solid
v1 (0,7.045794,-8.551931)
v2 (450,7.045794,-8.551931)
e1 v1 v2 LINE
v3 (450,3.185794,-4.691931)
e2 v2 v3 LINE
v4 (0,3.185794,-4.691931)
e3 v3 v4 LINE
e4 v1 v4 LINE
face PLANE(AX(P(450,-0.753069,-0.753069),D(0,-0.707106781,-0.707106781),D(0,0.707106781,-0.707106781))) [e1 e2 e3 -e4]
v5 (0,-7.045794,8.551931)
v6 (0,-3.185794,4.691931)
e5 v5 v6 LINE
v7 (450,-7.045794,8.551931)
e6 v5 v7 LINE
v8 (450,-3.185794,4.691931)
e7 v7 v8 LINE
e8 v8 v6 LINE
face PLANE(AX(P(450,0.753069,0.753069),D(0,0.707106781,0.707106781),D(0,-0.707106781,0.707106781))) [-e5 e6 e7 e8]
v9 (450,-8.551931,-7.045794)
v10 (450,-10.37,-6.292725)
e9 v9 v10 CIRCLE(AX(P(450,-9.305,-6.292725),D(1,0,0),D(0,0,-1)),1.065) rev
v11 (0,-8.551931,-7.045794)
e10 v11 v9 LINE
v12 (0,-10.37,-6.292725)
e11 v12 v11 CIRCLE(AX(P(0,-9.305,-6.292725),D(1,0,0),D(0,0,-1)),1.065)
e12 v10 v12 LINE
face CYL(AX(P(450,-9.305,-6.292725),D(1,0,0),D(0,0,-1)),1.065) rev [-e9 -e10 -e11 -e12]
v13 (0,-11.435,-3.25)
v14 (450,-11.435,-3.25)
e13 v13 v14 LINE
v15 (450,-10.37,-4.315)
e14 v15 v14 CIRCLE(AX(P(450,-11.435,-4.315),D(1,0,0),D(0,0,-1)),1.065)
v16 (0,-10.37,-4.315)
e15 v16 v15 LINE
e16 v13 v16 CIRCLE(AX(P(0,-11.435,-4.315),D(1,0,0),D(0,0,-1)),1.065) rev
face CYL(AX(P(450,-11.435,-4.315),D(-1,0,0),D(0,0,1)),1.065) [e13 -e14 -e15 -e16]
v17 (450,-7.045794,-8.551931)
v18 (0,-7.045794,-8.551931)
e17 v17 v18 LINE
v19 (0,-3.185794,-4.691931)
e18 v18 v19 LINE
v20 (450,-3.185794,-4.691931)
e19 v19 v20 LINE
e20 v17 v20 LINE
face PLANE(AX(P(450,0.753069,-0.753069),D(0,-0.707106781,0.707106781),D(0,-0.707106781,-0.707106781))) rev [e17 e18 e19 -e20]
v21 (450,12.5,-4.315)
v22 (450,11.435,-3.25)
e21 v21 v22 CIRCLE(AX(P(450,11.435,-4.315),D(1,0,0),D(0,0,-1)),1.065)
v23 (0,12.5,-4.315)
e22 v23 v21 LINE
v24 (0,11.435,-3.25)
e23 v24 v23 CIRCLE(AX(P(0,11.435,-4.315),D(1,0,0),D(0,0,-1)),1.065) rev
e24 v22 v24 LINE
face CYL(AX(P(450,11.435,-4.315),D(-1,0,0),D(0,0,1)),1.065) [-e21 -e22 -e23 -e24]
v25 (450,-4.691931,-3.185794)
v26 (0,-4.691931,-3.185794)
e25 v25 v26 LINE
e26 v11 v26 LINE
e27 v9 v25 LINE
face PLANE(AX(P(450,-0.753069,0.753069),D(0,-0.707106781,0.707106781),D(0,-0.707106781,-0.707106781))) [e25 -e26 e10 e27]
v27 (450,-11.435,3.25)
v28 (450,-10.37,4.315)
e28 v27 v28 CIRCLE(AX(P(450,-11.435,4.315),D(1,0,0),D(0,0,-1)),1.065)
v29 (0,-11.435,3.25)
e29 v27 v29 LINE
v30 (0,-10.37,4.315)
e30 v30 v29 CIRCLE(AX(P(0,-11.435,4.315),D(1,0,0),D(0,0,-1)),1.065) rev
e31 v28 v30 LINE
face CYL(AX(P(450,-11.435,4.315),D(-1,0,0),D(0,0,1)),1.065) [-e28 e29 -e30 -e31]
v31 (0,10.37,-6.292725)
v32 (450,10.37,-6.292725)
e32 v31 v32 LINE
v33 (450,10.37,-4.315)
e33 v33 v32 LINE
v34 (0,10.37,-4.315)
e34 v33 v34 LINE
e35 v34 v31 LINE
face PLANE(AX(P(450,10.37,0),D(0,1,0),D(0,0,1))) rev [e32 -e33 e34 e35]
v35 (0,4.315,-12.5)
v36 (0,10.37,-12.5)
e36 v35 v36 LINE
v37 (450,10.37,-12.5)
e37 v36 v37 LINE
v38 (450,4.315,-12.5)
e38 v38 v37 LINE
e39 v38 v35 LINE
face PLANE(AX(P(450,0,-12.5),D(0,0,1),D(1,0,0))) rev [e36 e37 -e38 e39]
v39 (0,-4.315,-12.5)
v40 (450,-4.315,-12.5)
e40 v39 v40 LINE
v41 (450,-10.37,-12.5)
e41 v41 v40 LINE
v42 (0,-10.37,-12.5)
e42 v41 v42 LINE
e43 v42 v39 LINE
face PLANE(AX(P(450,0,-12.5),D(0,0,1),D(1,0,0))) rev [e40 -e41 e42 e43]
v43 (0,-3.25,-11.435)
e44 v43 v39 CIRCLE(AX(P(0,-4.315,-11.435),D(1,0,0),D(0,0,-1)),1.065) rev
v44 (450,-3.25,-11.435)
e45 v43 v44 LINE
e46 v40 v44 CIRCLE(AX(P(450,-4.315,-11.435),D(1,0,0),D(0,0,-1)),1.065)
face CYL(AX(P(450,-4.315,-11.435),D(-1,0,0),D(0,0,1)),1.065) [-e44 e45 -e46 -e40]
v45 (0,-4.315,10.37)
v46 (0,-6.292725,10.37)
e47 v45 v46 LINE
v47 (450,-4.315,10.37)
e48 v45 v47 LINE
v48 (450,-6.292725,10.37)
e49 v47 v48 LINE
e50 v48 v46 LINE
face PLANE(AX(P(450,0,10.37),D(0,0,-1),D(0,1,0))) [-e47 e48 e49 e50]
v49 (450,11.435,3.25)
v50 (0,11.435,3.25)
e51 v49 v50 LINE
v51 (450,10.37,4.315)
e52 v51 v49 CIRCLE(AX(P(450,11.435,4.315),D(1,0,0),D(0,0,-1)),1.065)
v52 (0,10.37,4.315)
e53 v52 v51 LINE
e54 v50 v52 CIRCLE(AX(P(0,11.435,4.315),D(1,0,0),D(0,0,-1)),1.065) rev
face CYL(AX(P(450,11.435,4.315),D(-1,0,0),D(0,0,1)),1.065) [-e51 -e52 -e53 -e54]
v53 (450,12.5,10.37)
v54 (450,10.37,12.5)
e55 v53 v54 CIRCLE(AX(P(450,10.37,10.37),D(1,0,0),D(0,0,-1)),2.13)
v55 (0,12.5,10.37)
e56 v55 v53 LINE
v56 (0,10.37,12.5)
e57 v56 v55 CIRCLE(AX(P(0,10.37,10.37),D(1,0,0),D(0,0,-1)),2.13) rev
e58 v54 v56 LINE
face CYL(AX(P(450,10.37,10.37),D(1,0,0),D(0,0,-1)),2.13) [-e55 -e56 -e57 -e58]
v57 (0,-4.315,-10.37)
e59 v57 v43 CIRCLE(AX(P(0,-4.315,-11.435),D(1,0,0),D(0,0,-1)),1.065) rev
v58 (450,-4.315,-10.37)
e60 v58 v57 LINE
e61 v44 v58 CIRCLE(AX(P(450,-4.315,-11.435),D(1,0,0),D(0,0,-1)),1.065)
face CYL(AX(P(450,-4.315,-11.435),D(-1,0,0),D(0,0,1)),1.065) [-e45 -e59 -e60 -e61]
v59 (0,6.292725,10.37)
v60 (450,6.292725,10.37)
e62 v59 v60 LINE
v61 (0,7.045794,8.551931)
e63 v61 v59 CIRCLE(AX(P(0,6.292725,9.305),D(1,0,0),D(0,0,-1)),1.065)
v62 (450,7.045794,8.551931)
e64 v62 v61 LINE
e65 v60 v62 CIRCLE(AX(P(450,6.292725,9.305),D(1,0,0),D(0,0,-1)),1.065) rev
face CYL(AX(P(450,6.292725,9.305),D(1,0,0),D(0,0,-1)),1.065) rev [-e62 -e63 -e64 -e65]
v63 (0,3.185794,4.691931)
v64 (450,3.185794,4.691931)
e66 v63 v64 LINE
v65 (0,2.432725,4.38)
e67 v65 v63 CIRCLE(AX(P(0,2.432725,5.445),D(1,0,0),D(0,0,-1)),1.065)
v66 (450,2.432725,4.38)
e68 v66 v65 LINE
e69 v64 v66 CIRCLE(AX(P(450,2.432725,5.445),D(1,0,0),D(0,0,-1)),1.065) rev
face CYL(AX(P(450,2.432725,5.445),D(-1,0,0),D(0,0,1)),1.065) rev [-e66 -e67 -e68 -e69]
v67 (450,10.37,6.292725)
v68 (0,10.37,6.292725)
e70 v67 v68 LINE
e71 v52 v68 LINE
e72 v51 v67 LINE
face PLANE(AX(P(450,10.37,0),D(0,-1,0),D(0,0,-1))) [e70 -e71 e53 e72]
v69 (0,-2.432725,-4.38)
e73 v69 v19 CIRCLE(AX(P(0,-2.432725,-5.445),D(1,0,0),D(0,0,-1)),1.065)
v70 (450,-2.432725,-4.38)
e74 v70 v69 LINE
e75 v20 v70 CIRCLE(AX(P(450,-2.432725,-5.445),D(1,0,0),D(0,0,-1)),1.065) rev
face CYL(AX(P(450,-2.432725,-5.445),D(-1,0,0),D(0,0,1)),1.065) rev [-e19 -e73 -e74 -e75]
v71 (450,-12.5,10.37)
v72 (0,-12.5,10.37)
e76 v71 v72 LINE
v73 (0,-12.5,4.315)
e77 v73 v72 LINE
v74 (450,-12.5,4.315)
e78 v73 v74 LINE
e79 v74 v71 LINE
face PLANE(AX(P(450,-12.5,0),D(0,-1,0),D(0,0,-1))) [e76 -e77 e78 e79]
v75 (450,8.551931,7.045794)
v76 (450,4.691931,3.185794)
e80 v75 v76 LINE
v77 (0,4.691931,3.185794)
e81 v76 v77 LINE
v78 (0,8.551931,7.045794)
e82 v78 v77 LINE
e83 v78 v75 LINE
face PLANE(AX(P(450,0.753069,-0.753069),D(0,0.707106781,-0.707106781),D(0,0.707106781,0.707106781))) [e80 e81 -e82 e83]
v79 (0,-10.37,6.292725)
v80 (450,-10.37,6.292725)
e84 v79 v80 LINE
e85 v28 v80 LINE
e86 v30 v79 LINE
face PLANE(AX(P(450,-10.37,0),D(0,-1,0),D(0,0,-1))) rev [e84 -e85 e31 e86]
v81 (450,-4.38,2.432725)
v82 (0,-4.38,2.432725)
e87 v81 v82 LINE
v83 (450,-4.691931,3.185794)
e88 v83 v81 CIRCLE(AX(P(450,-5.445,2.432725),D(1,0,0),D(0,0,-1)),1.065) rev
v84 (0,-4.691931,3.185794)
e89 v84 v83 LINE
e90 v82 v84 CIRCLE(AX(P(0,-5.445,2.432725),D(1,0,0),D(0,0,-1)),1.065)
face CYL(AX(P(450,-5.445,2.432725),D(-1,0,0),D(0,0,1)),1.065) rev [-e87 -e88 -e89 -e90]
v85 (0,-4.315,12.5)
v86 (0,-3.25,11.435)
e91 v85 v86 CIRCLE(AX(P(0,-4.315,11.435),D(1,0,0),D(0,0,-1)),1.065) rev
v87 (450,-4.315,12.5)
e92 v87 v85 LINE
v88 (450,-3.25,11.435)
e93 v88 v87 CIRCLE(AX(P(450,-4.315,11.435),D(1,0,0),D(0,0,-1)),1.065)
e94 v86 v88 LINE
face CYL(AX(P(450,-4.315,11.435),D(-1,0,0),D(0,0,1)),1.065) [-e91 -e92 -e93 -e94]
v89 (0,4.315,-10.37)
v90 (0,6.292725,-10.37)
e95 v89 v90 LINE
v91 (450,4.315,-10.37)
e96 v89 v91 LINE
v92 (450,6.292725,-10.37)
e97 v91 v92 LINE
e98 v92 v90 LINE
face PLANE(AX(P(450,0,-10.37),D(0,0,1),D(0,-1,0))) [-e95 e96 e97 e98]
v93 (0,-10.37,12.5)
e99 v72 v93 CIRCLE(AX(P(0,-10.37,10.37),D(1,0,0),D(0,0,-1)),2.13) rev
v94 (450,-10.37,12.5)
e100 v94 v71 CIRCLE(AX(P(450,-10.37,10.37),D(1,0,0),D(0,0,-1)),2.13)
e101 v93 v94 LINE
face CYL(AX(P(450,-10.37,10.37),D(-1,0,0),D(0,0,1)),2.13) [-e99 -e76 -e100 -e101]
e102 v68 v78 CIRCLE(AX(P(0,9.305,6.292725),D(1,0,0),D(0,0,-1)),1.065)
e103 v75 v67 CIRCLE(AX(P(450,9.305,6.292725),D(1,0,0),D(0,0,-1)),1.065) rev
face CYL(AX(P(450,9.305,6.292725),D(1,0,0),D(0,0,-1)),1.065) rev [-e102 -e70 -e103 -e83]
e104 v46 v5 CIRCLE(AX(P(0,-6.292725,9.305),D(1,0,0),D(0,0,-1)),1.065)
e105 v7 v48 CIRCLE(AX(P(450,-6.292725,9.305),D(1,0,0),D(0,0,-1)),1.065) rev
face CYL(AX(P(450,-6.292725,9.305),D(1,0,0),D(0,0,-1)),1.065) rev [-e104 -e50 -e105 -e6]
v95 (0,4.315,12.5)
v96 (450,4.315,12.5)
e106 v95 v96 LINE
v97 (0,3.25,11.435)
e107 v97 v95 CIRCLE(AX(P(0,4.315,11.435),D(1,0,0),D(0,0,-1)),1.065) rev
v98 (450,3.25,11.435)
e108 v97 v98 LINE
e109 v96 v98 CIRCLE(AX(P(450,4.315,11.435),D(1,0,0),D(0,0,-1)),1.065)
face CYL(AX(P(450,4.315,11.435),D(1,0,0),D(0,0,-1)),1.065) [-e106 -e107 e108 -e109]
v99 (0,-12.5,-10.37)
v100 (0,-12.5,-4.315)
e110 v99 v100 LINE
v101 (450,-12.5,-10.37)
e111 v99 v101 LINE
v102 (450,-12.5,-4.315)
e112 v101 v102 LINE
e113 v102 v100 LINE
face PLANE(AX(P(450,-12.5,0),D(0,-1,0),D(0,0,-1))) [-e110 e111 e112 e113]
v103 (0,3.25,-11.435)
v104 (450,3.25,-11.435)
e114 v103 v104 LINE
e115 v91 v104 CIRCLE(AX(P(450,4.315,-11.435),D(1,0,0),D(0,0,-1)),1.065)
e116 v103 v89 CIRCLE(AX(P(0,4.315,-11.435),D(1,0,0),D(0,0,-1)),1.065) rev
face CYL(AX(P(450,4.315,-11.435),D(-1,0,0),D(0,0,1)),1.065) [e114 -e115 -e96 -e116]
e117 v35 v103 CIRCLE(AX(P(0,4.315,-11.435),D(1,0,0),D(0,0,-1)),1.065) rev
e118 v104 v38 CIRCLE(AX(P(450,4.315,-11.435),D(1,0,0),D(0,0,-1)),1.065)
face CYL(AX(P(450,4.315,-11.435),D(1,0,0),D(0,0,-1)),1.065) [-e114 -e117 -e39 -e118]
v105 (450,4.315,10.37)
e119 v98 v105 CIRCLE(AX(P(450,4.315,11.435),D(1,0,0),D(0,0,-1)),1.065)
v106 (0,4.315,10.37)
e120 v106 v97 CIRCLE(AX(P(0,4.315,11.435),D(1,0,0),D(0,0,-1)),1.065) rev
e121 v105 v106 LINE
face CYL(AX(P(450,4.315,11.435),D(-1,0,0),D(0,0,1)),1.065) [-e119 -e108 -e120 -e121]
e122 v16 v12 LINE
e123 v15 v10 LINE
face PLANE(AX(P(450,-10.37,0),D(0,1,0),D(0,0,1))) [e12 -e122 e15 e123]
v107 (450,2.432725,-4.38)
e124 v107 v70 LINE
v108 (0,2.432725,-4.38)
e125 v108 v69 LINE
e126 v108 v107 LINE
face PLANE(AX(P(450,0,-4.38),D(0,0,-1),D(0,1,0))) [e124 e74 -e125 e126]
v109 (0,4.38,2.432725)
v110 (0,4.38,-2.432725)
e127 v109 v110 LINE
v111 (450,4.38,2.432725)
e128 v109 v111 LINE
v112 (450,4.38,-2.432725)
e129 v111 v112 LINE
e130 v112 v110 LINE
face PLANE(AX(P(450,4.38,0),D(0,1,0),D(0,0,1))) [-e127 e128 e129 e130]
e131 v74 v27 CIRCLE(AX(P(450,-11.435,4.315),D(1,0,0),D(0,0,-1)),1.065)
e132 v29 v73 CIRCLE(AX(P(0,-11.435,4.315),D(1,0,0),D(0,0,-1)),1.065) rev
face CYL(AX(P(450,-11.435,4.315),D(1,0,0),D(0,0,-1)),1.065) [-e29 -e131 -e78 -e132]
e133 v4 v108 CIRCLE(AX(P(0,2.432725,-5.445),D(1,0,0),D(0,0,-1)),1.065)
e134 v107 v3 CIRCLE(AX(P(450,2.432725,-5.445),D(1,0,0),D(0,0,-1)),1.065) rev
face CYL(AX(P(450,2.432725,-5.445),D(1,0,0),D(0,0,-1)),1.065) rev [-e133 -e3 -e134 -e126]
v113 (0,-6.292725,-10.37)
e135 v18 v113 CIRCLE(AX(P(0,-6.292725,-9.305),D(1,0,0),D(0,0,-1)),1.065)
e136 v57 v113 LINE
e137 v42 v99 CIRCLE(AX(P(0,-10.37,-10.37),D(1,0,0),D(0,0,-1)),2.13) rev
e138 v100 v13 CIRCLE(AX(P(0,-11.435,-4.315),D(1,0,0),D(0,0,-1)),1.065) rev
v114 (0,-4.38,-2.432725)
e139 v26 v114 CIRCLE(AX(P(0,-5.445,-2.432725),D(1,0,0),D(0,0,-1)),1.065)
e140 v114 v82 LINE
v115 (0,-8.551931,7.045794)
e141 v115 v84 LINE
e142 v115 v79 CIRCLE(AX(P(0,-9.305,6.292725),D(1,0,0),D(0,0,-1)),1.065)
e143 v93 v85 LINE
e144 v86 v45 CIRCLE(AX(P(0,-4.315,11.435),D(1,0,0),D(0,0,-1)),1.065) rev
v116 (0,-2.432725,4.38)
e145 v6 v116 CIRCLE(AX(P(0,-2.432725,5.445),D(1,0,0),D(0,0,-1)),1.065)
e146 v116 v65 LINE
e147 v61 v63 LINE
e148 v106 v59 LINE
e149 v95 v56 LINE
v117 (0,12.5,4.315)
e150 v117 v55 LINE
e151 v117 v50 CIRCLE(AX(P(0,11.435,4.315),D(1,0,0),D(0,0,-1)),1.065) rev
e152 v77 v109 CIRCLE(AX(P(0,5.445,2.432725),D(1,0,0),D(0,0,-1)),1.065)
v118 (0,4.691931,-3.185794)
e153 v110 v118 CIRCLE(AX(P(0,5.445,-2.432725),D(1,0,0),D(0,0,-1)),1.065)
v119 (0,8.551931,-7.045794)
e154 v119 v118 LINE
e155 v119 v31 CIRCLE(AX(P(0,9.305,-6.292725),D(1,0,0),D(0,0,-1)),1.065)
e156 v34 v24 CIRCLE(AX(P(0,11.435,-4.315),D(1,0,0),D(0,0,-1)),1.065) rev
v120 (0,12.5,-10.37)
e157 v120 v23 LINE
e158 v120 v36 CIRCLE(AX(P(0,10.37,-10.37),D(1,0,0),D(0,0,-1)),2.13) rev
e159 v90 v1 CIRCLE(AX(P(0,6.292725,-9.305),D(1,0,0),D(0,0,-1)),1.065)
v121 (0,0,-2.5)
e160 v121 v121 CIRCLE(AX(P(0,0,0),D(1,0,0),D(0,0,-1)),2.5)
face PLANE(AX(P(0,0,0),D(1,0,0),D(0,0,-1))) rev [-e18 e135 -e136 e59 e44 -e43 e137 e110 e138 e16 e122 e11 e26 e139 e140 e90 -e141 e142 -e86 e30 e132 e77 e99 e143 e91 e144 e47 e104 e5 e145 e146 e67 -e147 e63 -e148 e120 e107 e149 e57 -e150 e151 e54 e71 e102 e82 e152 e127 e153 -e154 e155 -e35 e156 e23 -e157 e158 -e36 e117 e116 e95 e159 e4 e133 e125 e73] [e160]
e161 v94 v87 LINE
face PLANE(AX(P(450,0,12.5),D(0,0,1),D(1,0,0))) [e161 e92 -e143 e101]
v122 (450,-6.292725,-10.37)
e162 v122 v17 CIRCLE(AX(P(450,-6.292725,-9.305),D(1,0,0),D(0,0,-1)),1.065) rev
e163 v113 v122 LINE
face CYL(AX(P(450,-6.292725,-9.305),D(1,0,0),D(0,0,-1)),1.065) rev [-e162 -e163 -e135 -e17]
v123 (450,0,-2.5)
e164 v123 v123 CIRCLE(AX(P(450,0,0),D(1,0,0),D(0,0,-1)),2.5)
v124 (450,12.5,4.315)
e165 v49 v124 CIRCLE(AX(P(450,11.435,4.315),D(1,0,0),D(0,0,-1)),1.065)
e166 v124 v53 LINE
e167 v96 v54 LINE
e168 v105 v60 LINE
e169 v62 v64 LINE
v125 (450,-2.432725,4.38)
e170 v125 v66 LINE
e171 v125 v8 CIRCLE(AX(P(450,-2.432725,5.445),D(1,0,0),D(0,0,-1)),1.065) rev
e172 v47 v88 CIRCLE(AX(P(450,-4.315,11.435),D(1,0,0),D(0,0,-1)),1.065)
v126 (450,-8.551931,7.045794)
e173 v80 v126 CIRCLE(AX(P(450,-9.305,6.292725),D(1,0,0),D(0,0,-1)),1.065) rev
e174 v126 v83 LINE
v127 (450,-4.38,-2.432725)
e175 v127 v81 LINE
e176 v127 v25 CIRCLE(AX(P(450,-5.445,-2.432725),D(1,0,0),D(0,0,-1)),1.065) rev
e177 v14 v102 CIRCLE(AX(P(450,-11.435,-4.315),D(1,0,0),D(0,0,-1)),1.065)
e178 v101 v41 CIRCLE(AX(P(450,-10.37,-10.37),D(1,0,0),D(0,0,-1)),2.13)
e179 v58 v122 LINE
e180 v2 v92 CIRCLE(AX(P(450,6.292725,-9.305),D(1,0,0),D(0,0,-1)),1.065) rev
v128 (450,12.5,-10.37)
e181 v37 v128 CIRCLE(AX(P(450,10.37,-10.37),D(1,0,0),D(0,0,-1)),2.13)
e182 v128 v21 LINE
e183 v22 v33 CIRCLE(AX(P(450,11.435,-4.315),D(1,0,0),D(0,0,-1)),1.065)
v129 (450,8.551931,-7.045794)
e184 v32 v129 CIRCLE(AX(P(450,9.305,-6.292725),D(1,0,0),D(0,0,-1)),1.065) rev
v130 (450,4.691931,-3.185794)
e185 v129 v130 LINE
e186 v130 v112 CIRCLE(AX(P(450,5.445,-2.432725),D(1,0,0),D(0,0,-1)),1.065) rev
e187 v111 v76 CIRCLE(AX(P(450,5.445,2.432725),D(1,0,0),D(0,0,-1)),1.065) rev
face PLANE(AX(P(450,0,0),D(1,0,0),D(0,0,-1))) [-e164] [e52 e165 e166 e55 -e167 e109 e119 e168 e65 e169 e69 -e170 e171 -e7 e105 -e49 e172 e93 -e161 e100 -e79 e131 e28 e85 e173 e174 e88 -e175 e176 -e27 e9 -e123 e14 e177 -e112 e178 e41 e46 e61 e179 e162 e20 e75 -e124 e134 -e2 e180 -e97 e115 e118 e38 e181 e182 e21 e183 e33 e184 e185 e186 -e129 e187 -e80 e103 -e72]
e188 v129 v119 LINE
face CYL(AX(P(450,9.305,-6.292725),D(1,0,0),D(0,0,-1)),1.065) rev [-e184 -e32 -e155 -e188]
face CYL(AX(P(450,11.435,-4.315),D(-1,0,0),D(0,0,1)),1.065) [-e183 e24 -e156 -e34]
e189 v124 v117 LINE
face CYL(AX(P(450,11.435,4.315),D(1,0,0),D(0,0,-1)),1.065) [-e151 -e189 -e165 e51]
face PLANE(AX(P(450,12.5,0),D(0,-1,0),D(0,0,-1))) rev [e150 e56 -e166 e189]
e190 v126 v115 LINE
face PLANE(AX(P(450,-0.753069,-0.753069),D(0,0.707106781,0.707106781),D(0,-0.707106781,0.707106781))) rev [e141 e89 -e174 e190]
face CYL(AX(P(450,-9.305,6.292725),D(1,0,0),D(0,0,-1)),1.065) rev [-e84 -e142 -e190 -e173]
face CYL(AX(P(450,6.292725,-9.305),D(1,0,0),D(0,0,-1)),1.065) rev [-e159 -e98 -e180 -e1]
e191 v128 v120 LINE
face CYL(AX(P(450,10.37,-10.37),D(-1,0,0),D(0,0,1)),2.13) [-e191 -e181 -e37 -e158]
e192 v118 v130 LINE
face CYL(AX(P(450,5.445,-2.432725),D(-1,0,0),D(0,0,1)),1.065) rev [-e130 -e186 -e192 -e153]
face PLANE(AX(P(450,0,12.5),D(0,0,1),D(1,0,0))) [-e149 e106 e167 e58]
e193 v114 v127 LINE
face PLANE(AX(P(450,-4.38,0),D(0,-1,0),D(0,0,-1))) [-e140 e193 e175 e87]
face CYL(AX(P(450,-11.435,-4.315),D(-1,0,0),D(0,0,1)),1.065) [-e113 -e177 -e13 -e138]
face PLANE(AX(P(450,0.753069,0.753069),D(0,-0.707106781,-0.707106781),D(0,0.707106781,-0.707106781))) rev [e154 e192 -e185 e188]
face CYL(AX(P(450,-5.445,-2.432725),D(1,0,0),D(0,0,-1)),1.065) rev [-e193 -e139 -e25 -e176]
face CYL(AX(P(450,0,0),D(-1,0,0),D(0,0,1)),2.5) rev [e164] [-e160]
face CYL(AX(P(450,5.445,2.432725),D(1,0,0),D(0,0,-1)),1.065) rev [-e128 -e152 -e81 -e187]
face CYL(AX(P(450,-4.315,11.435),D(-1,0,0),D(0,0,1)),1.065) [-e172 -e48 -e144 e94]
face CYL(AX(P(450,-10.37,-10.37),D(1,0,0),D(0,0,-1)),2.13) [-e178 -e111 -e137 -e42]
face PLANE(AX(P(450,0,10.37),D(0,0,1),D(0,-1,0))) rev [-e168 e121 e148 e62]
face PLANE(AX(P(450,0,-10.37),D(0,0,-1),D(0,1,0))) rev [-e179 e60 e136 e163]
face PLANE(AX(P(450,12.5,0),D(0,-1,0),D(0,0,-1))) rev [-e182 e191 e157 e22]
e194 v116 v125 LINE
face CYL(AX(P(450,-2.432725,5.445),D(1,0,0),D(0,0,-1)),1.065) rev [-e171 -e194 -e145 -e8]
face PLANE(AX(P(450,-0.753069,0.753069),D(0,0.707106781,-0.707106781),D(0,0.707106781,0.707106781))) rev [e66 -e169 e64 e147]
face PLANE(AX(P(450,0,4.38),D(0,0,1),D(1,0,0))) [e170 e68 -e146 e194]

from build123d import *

# Parameters (mm, degrees)
SKETCH1_R           = 2.5
BOSS_EXTRUDE1_DEPTH = 450
FILLET1_R           = 1.065
FILLET2_R           = 2.13


with BuildPart() as part:
    # Sketch1 → Boss-Extrude1 (new body)
    with BuildSketch(Plane.YZ):
        Polygon((-12.5, -3.25), (-12.5, -12.5), (-3.25, -12.5), (-3.25, -10.37), (-8.863862556, -10.37), (-2.873862556, -4.38), (2.873862556, -4.38), (8.863862556, -10.37), (3.25, -10.37), (3.25, -12.5), (12.5, -12.5), (12.5, -3.25), (10.37, -3.25), (10.37, -8.863862556), (4.38, -2.873862556), (4.38, 2.873862556), (10.37, 8.863862556), (10.37, 3.25), (12.5, 3.25), (12.5, 12.5), (3.25, 12.5), (3.25, 10.37), (8.863862556, 10.37), (2.873862556, 4.38), (-2.873862556, 4.38), (-8.863862556, 10.37), (-3.25, 10.37), (-3.25, 12.5), (-12.5, 12.5), (-12.5, 3.25), (-10.37, 3.25), (-10.37, 8.863862556), (-4.38, 2.873862556), (-4.38, -2.873862556), (-10.37, -8.863862556), (-10.37, -3.25), align=None)
        with Locations(Location((0, 0, 0), (0, 0, 270))):
            Circle(SKETCH1_R, mode=Mode.SUBTRACT)
    extrude(amount=BOSS_EXTRUDE1_DEPTH)

    # Fillet1
    fillet1_edges = [part.edges().sort_by_distance(p)[0] for p in [
        (225, -10.37, -8.863862556),
        (225, 2.873862556, -4.38),
        (225, -2.873862556, -4.38),
        (225, -4.38, 2.873862556),
        (225, -4.38, -2.873862556),
        (225, -2.873862556, 4.38),
        (225, 2.873862556, 4.38),
        (225, 4.38, 2.873862556),
        (225, 4.38, -2.873862556),
        (225, -8.863862556, -10.37),
        (225, 8.863862556, -10.37),
        (225, 10.37, -8.863862556),
        (225, -10.37, 8.863862556),
        (225, -8.863862556, 10.37),
        (225, 10.37, 8.863862556),
        (225, 8.863862556, 10.37),
        (225, 12.5, 3.25),
        (225, -3.25, -12.5),
        (225, -10.37, 3.25),
        (225, 10.37, 3.25),
        (225, -10.37, -3.25),
        (225, -12.5, -3.25),
        (225, -12.5, 3.25),
        (225, 3.25, -10.37),
        (225, -3.25, -10.37),
        (225, 3.25, -12.5),
        (225, 10.37, -3.25),
        (225, 12.5, -3.25),
        (225, 3.25, 12.5),
        (225, 3.25, 10.37),
        (225, -3.25, 10.37),
        (225, -3.25, 12.5),
    ]]
    fillet(fillet1_edges, radius=FILLET1_R - 0.0001)  # a hair under: the kernel refuses the full size

    # Fillet2
    fillet2_edges = [part.edges().sort_by_distance(p)[0] for p in [
        (225, -12.5, 12.5),
        (225, 12.5, 12.5),
        (225, 12.5, -12.5),
        (225, -12.5, -12.5),
    ]]
    fillet(fillet2_edges, radius=FILLET2_R)


solid = part.part
